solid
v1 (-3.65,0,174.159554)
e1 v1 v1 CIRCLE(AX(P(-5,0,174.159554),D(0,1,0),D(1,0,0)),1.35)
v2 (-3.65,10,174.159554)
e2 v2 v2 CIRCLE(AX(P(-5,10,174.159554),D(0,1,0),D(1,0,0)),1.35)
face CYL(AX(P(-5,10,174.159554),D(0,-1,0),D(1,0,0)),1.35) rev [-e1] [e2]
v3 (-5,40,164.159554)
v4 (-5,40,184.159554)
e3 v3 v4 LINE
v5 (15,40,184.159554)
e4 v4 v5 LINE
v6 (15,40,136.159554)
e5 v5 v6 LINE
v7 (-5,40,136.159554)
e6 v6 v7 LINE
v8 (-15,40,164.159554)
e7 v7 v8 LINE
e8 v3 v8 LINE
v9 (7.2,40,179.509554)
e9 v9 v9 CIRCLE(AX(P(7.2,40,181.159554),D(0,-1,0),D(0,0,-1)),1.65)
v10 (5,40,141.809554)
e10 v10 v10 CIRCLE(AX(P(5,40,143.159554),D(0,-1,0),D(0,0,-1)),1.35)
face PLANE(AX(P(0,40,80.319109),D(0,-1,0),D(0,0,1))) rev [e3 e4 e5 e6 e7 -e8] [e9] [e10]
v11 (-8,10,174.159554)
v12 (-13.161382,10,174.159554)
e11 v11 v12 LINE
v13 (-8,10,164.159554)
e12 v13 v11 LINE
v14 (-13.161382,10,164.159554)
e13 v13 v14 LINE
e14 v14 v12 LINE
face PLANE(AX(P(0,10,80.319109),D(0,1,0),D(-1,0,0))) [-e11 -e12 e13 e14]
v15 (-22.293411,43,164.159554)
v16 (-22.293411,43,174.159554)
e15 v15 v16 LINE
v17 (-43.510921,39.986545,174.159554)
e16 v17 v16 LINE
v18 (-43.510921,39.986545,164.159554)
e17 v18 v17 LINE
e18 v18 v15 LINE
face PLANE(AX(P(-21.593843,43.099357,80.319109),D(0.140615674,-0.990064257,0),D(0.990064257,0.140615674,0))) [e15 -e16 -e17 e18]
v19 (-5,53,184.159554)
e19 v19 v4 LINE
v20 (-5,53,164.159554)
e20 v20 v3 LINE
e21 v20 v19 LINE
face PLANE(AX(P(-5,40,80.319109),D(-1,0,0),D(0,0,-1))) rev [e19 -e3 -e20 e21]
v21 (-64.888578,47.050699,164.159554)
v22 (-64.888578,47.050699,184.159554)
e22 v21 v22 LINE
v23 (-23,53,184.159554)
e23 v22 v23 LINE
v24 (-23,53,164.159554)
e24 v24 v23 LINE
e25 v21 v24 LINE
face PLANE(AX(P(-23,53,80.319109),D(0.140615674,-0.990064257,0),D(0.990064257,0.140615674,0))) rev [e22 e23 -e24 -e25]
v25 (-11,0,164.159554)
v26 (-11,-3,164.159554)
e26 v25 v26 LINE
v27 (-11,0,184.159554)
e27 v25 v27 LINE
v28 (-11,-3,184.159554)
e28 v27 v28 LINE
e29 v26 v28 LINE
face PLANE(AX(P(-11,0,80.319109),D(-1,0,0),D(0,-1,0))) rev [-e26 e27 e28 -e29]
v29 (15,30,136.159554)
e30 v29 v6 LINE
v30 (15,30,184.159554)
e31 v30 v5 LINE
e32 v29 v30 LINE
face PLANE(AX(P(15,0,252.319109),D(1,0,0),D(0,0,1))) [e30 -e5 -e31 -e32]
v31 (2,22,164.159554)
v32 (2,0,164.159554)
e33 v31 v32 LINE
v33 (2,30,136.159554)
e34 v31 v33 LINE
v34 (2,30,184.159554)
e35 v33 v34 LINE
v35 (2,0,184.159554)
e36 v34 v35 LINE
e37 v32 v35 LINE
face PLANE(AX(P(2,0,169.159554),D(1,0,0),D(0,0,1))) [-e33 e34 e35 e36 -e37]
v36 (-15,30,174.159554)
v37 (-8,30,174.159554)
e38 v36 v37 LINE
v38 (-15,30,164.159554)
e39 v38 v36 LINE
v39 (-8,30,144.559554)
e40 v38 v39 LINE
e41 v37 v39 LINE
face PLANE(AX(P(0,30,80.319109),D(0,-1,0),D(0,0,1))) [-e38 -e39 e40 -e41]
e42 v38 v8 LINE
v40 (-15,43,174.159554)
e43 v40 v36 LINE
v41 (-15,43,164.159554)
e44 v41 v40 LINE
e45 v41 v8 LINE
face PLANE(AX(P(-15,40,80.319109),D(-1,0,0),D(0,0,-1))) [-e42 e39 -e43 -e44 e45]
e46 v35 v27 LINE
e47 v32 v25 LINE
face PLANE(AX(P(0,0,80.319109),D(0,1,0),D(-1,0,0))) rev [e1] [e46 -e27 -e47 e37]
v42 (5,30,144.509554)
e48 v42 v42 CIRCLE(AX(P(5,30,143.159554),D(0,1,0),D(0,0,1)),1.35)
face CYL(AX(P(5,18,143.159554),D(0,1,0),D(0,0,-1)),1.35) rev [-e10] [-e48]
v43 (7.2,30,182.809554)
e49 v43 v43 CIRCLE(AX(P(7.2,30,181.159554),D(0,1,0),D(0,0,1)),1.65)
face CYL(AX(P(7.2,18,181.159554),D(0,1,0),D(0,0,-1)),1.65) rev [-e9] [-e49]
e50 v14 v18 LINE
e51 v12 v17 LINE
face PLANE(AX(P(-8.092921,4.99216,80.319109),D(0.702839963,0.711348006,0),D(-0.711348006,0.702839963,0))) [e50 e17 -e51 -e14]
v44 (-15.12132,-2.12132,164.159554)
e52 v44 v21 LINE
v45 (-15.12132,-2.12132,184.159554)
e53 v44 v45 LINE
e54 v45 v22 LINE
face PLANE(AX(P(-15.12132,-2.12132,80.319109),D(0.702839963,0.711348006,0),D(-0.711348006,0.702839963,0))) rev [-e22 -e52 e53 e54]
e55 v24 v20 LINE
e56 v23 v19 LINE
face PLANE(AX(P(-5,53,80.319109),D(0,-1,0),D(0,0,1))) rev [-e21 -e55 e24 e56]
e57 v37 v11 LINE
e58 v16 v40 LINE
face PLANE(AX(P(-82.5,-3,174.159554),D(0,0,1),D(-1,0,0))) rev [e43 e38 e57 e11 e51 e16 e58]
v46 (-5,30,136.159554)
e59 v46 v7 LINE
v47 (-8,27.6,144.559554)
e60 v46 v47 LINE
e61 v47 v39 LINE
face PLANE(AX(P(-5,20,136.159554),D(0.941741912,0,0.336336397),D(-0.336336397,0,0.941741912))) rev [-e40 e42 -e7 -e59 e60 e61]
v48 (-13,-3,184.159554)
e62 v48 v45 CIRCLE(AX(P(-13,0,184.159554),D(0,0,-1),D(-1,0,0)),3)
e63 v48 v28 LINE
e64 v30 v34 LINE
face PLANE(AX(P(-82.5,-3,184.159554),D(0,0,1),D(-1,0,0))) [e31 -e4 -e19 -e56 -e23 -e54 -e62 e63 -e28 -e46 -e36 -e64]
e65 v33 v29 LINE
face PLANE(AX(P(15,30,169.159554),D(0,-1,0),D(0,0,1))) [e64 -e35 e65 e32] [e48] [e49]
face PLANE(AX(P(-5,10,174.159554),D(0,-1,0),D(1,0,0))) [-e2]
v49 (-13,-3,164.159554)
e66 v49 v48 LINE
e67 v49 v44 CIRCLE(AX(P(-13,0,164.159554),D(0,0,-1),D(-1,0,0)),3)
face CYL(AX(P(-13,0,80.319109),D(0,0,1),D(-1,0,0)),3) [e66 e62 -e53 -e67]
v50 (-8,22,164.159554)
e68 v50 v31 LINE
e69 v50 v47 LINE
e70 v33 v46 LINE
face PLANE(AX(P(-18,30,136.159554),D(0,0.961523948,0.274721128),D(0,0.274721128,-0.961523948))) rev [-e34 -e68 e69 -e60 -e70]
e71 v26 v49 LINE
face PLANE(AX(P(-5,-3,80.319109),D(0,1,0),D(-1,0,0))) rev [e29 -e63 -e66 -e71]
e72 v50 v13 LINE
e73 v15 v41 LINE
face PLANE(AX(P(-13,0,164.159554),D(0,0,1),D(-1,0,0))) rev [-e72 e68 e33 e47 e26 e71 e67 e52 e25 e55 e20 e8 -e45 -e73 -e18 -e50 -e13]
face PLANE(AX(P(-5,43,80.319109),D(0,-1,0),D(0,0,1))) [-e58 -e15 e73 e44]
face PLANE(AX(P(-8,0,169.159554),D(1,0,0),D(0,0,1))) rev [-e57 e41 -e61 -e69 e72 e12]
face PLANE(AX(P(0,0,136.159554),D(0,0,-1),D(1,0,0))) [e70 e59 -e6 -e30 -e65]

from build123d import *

# Parameters (mm, degrees)
EXTRUDE_1_DEPTH       = 172
SHELL_START           = 6
SHELL_1_DEPTH         = 160
SKETCH_2_W            = 36
SKETCH_2_H            = 16
CUT_EXTRUDE_1_DEPTH   = 74
EXTRUDE_2_DEPTH       = 2
SKETCH_4_R            = 10
CUT_EXTRUDE_2_DEPTH   = 186
SKETCH_5_R            = 1.5
CUT_EXTRUDE_3_DEPTH   = 10
EXTRUDE_3_DEPTH       = 172
SKETCH_7_W            = 36
SKETCH_7_H            = 16
CUT_EXTRUDE_4_DEPTH   = 172
SKETCH_8_W            = 6
SKETCH_8_H            = 172
CUT_EXTRUDE_5_DEPTH   = 3
EXTRUDE_4_DEPTH       = 15
CHAMFER_1_SIZE        = 15
CHAMFER_2_SIZE        = 15
CHAMFER_3_SIZE        = 8
SKETCH_10_R           = 1.35
CUT_EXTRUDE_6_DEPTH   = 15
SKETCH_12_R           = 1.35
CUT_EXTRUDE_7_DEPTH   = 15
SKETCH_14_OUTSIDE_W   = 213.548
SKETCH_14_OUTSIDE_H   = 97.548
SKETCH_14_OUTSIDE_W_2 = 15
SKETCH_14_OUTSIDE_H_2 = 56
CUT_EXTRUDE_8_DEPTH   = 82.5
EXTRUDE_5_DEPTH       = 15
CUT_EXTRUDE_9_DEPTH   = 15
SKETCH_17_W           = 13
SKETCH_17_H           = 5
EXTRUDE_6_DEPTH       = 15
EXTRUDE_7_DEPTH       = 20
SHELL_START_2         = 78.159554327
SHELL_2_DEPTH         = 10
EXTRUDE_8_DEPTH       = 28
CUT_EXTRUDE_10_DEPTH  = 20
CUT_EXTRUDE_11_DEPTH  = 20
SKETCH_23_R           = 1.65
SKETCH_23_R_2         = 1.35
CUT_EXTRUDE_12_DEPTH  = 22
SKETCH_26_R           = 1.35
CUT_EXTRUDE_14_DEPTH  = 10
CUT_EXTRUDE_15_DEPTH  = 82.5


# Read off the part's stored shape, not the designer's step: 抽壳1, 抽壳2
with BuildPart() as part:
    # 草图1 → 凸台-拉伸1 (new body)
    with BuildSketch(Plane.XY):
        with BuildLine():
            Line((0, 0), (0, 40))
            Line((0, 40), (-5, 40))
            Line((-5, 40), (-5, 53))
            Line((-5, 53), (-23, 53))
            Line((-23, 53), (-64.888578151, 47.050698608))
            Line((-64.888578151, 47.050698608), (-15.121320344, -2.121320344))
            ThreePointArc((-15.121320344, -2.121320344), (-14.148050297, -2.771638598), (-13, -3))
            Line((-13, -3), (-5, -3))
            Line((-5, -3), (-5, 0))
            Line((-5, 0), (0, 0))
        make_face()
    extrude(amount=EXTRUDE_1_DEPTH)

    # 抽壳1 outline → 抽壳1 (cut)
    with BuildSketch(Plane.XY.offset(SHELL_START)):
        Polygon((-11, 6), (-6, 6), (-6, 34), (-11, 34), (-11, 47), (-22.576046832, 47), (-52.061983815, 42.812206246), (-11.767841448, 3), (-11, 3), align=None)
    extrude(amount=SHELL_1_DEPTH, mode=Mode.SUBTRACT)

    # 草图2 → 切除-拉伸1 (cut)
    with BuildSketch(Plane(origin=(0, 0, 0), x_dir=(0, 0, -1), z_dir=(1, 0, 0))):
        with Locations((-136, 10)):
            Rectangle(SKETCH_2_W, SKETCH_2_H)
        with Locations((-36, 10)):
            Rectangle(SKETCH_2_W, SKETCH_2_H)
    extrude(amount=-CUT_EXTRUDE_1_DEPTH, mode=Mode.SUBTRACT)

    # 草图3 → 凸台-拉伸2 (add, symmetric)
    with BuildSketch(Plane(origin=(0, 0, 86), x_dir=(-1, 0, 0), z_dir=(0, 0, -1))):
        Polygon((5, 53), (5, 40), (0, 40), (0, 0), (5, 0), (5, -3), (13, -3), (16.579355858, -0.680723591), (64.888578151, 47.050698608), (23, 53), align=None)
    extrude(amount=EXTRUDE_2_DEPTH, both=True)

    # 草图4 → 切除-拉伸2 (cut)
    with BuildSketch(Plane.XY.offset(172)):
        with Locations((-15, 21.071297481)):
            Circle(SKETCH_4_R)
    extrude(amount=-CUT_EXTRUDE_2_DEPTH, mode=Mode.SUBTRACT)

    # 草图5 → 切除-拉伸3 (cut)
    with BuildSketch(Plane(origin=(0, 53, 0), x_dir=(1, 0, 0), z_dir=(0, 1, 0))):
        with Locations(Location((-13.338195438, -63.5, 0), (0, 0, 270))):
            Circle(SKETCH_5_R)
        with Locations(Location((-13.338195438, -108.5, 0), (0, 0, 270))):
            Circle(SKETCH_5_R)
    extrude(amount=-CUT_EXTRUDE_3_DEPTH, mode=Mode.SUBTRACT)

    # 草图6 → 凸台-拉伸3 (add)
    with BuildSketch(Plane.XY.offset(172)):
        Polygon((-11, 6), (-14.804157153, 6), (-11.767841448, 3), (-11, 3), align=None)
    extrude(amount=-EXTRUDE_3_DEPTH)

    # 草图7 → 切除-拉伸4 (cut)
    with BuildSketch(Plane(origin=(0, 0, 0), x_dir=(0, 0, -1), z_dir=(1, 0, 0))):
        with Locations((-136, 10)):
            Rectangle(SKETCH_7_W, SKETCH_7_H)
        with Locations((-36, 10)):
            Rectangle(SKETCH_7_W, SKETCH_7_H)
    extrude(amount=-CUT_EXTRUDE_4_DEPTH, mode=Mode.SUBTRACT)

    # 草图8 → 切除-拉伸5 (cut)
    with BuildSketch(Plane.XZ.offset(3)):
        with Locations((-8, 86)):
            Rectangle(SKETCH_8_W, SKETCH_8_H)
    extrude(amount=-CUT_EXTRUDE_5_DEPTH, mode=Mode.SUBTRACT)

    # 草图9 → 凸台-拉伸4 (add)
    with BuildSketch(Plane(origin=(0, 0, 0), x_dir=(0, 0, -1), z_dir=(1, 0, 0))):
        Polygon((-86, 40), (-151, 40), (-151, 35), (-86, 35), (-21, 35), (-21, 40), align=None)
    extrude(amount=EXTRUDE_4_DEPTH)

    # 倒角1
    chamfer_1_edges = [part.edges().sort_by_distance(p)[0] for p in [
        (15, 37.5, 151),
    ]]
    chamfer(chamfer_1_edges, length=CHAMFER_1_SIZE - 0.0001)  # a hair under: the kernel refuses the full size

    # 倒角2
    chamfer_2_edges = [part.edges().sort_by_distance(p)[0] for p in [
        (15, 37.5, 21),
    ]]
    chamfer(chamfer_2_edges, length=CHAMFER_2_SIZE - 0.0001)  # a hair under: the kernel refuses the full size

    # 倒角3
    chamfer_3_edges = [part.edges().sort_by_distance(p)[0] for p in [
        (0, 35, 86),
    ]]
    chamfer(chamfer_3_edges, length=CHAMFER_3_SIZE)

    # 草图10 → 切除-拉伸6 (cut)
    with BuildSketch(Plane.XZ):
        with Locations((-5, 158)):
            Circle(SKETCH_10_R)
        with Locations((-5, 111)):
            Circle(SKETCH_10_R)
        with Locations((-5, 61)):
            Circle(SKETCH_10_R)
        with Locations((-5, 14.01360213)):
            Circle(SKETCH_10_R)
    extrude(amount=-CUT_EXTRUDE_6_DEPTH, mode=Mode.SUBTRACT)

    # 草图12 → 切除-拉伸7 (cut)
    with BuildSketch(Plane(origin=(0, 40, 0), x_dir=(1, 0, 0), z_dir=(0, 1, 0))):
        with Locations(Location((5, -41, 0), (0, 0, 270))):
            Circle(SKETCH_12_R)
        with Locations(Location((5, -86, 0), (0, 0, 270))):
            Circle(SKETCH_12_R)
        with Locations(Location((5, -131, 0), (0, 0, 270))):
            Circle(SKETCH_12_R)
    extrude(amount=-CUT_EXTRUDE_7_DEPTH, mode=Mode.SUBTRACT)

    # 草图14 outside → 切除-拉伸8 (cut, symmetric)
    with BuildSketch(Plane(origin=(0, 0, 0), x_dir=(0, 0, -1), z_dir=(1, 0, 0))):
        with Locations((-86, 25)):
            Rectangle(SKETCH_14_OUTSIDE_W, SKETCH_14_OUTSIDE_H)
        with Locations((-75.659554327, 25)):
            Rectangle(SKETCH_14_OUTSIDE_W_2, SKETCH_14_OUTSIDE_H_2, mode=Mode.SUBTRACT)
    extrude(amount=CUT_EXTRUDE_8_DEPTH, both=True, mode=Mode.SUBTRACT)

    # 草图15 → 凸台-拉伸5 (add)
    with BuildSketch(Plane(origin=(0, 0, 68.159554327), x_dir=(-1, 0, 0), z_dir=(0, 0, -1))):
        Polygon((0, 0), (-2, 0), (-2, 29), (0, 27), align=None)
    extrude(amount=-EXTRUDE_5_DEPTH)

    # 草图16 → 切除-拉伸9 (cut)
    with BuildSketch(Plane(origin=(0, 0, 68.159554327), x_dir=(-1, 0, 0), z_dir=(0, 0, -1))):
        Polygon((-2, 29), (-2, 35), (-8, 35), align=None)
    extrude(amount=-CUT_EXTRUDE_9_DEPTH, mode=Mode.SUBTRACT)

    # 草图17 → 凸台-拉伸6 (add)
    with BuildSketch(Plane(origin=(0, 0, 68.159554327), x_dir=(-1, 0, 0), z_dir=(0, 0, -1))):
        with Locations((-8.5, 32.5)):
            Rectangle(SKETCH_17_W, SKETCH_17_H)
    extrude(amount=-EXTRUDE_6_DEPTH)

    # 草图18 → 凸台-拉伸7 (add)
    with BuildSketch(Plane(origin=(0, 0, 68.159554327), x_dir=(-1, 0, 0), z_dir=(0, 0, -1))):
        with BuildLine():
            Line((-15, 40), (-15, 30))
            Line((-15, 30), (-2, 30))
            Line((-2, 30), (-2, 0))
            Line((-2, 0), (11, 0))
            Line((11, 0), (11, -3))
            Line((11, -3), (13, -3))
            ThreePointArc((13, -3), (14.148050297, -2.771638598), (15.121320344, -2.121320344))
            Line((15.121320344, -2.121320344), (64.888578151, 47.050698608))
            Line((64.888578151, 47.050698608), (23, 53))
            Line((23, 53), (5, 53))
            Line((5, 53), (5, 40))
            Line((5, 40), (-15, 40))
        make_face()
    extrude(amount=-EXTRUDE_7_DEPTH)

    # 抽壳2 outline → 抽壳2 (cut)
    with BuildSketch(Plane.XY.offset(SHELL_START_2)):
        Polygon((-8, 30), (-15, 30), (-15, 43), (-22.293411387, 43), (-43.510920925, 39.986544671), (-13.161382076, 10), (-8, 10), align=None)
    extrude(amount=SHELL_2_DEPTH, mode=Mode.SUBTRACT)

    # 草图20 → 凸台-拉伸8 (add)
    with BuildSketch(Plane.XY.offset(88.159554327)):
        Polygon((15, 40), (-15, 40), (-15, 30), (-8, 30), (-8, 22), (2, 22), (2, 30), (15, 30), align=None)
    extrude(amount=EXTRUDE_8_DEPTH)

    # 草图21 → 切除-拉伸10 (cut)
    with BuildSketch(Plane(origin=(2, 0, 0), x_dir=(0, 0, -1), z_dir=(1, 0, 0))):
        Polygon((-116.159554327, 30), (-88.159554327, 22), (-116.159554327, 22), align=None)
    extrude(amount=-CUT_EXTRUDE_10_DEPTH, mode=Mode.SUBTRACT)

    # 草图22 → 切除-拉伸11 (cut)
    with BuildSketch(Plane(origin=(0, 40, 0), x_dir=(1, 0, 0), z_dir=(0, 1, 0))):
        Polygon((-8, -116.159554327), (-15, -116.159554327), (-15, -88.159554327), (-5, -116.159554327), align=None)
    extrude(amount=-CUT_EXTRUDE_11_DEPTH, mode=Mode.SUBTRACT)

    # 草图23 → 切除-拉伸12 (cut)
    with BuildSketch(Plane(origin=(0, 40, 0), x_dir=(1, 0, 0), z_dir=(0, 1, 0))):
        with Locations(Location((7.2, -71.159554327, 0), (0, 0, 270))):
            Circle(SKETCH_23_R)
        with Locations(Location((5, -109.159554327, 0), (0, 0, 270))):
            Circle(SKETCH_23_R_2)
    extrude(amount=-CUT_EXTRUDE_12_DEPTH, mode=Mode.SUBTRACT)

    # 草图26 → 切除-拉伸14 (cut)
    with BuildSketch(Plane.XZ):
        with Locations((-5, 78.159554327)):
            Circle(SKETCH_26_R)
    extrude(amount=-CUT_EXTRUDE_14_DEPTH, mode=Mode.SUBTRACT)


with BuildPart() as body_2:
    # 镜向2: mirrored copy
    add(part.part.mirror(Plane.XY.offset(126.159554327)))


with BuildPart() as part_1:
    add(part.part)

    # 草图27 → 切除-拉伸15 (cut, symmetric)
    with BuildSketch(Plane(origin=(0, 40, 0), x_dir=(1, 0, 0), z_dir=(0, 1, 0))):
        Polygon((-70.30444709, -126.427743847), (59.164340296, -124.069061785), (93.545633321, -94.969295867), (93.545633321, -36.488882893), (-105.077867855, -19.264077709), (-117.933649563, -88.897060516), align=None)
    extrude(amount=CUT_EXTRUDE_15_DEPTH, both=True, mode=Mode.SUBTRACT)


solid = body_2.part
